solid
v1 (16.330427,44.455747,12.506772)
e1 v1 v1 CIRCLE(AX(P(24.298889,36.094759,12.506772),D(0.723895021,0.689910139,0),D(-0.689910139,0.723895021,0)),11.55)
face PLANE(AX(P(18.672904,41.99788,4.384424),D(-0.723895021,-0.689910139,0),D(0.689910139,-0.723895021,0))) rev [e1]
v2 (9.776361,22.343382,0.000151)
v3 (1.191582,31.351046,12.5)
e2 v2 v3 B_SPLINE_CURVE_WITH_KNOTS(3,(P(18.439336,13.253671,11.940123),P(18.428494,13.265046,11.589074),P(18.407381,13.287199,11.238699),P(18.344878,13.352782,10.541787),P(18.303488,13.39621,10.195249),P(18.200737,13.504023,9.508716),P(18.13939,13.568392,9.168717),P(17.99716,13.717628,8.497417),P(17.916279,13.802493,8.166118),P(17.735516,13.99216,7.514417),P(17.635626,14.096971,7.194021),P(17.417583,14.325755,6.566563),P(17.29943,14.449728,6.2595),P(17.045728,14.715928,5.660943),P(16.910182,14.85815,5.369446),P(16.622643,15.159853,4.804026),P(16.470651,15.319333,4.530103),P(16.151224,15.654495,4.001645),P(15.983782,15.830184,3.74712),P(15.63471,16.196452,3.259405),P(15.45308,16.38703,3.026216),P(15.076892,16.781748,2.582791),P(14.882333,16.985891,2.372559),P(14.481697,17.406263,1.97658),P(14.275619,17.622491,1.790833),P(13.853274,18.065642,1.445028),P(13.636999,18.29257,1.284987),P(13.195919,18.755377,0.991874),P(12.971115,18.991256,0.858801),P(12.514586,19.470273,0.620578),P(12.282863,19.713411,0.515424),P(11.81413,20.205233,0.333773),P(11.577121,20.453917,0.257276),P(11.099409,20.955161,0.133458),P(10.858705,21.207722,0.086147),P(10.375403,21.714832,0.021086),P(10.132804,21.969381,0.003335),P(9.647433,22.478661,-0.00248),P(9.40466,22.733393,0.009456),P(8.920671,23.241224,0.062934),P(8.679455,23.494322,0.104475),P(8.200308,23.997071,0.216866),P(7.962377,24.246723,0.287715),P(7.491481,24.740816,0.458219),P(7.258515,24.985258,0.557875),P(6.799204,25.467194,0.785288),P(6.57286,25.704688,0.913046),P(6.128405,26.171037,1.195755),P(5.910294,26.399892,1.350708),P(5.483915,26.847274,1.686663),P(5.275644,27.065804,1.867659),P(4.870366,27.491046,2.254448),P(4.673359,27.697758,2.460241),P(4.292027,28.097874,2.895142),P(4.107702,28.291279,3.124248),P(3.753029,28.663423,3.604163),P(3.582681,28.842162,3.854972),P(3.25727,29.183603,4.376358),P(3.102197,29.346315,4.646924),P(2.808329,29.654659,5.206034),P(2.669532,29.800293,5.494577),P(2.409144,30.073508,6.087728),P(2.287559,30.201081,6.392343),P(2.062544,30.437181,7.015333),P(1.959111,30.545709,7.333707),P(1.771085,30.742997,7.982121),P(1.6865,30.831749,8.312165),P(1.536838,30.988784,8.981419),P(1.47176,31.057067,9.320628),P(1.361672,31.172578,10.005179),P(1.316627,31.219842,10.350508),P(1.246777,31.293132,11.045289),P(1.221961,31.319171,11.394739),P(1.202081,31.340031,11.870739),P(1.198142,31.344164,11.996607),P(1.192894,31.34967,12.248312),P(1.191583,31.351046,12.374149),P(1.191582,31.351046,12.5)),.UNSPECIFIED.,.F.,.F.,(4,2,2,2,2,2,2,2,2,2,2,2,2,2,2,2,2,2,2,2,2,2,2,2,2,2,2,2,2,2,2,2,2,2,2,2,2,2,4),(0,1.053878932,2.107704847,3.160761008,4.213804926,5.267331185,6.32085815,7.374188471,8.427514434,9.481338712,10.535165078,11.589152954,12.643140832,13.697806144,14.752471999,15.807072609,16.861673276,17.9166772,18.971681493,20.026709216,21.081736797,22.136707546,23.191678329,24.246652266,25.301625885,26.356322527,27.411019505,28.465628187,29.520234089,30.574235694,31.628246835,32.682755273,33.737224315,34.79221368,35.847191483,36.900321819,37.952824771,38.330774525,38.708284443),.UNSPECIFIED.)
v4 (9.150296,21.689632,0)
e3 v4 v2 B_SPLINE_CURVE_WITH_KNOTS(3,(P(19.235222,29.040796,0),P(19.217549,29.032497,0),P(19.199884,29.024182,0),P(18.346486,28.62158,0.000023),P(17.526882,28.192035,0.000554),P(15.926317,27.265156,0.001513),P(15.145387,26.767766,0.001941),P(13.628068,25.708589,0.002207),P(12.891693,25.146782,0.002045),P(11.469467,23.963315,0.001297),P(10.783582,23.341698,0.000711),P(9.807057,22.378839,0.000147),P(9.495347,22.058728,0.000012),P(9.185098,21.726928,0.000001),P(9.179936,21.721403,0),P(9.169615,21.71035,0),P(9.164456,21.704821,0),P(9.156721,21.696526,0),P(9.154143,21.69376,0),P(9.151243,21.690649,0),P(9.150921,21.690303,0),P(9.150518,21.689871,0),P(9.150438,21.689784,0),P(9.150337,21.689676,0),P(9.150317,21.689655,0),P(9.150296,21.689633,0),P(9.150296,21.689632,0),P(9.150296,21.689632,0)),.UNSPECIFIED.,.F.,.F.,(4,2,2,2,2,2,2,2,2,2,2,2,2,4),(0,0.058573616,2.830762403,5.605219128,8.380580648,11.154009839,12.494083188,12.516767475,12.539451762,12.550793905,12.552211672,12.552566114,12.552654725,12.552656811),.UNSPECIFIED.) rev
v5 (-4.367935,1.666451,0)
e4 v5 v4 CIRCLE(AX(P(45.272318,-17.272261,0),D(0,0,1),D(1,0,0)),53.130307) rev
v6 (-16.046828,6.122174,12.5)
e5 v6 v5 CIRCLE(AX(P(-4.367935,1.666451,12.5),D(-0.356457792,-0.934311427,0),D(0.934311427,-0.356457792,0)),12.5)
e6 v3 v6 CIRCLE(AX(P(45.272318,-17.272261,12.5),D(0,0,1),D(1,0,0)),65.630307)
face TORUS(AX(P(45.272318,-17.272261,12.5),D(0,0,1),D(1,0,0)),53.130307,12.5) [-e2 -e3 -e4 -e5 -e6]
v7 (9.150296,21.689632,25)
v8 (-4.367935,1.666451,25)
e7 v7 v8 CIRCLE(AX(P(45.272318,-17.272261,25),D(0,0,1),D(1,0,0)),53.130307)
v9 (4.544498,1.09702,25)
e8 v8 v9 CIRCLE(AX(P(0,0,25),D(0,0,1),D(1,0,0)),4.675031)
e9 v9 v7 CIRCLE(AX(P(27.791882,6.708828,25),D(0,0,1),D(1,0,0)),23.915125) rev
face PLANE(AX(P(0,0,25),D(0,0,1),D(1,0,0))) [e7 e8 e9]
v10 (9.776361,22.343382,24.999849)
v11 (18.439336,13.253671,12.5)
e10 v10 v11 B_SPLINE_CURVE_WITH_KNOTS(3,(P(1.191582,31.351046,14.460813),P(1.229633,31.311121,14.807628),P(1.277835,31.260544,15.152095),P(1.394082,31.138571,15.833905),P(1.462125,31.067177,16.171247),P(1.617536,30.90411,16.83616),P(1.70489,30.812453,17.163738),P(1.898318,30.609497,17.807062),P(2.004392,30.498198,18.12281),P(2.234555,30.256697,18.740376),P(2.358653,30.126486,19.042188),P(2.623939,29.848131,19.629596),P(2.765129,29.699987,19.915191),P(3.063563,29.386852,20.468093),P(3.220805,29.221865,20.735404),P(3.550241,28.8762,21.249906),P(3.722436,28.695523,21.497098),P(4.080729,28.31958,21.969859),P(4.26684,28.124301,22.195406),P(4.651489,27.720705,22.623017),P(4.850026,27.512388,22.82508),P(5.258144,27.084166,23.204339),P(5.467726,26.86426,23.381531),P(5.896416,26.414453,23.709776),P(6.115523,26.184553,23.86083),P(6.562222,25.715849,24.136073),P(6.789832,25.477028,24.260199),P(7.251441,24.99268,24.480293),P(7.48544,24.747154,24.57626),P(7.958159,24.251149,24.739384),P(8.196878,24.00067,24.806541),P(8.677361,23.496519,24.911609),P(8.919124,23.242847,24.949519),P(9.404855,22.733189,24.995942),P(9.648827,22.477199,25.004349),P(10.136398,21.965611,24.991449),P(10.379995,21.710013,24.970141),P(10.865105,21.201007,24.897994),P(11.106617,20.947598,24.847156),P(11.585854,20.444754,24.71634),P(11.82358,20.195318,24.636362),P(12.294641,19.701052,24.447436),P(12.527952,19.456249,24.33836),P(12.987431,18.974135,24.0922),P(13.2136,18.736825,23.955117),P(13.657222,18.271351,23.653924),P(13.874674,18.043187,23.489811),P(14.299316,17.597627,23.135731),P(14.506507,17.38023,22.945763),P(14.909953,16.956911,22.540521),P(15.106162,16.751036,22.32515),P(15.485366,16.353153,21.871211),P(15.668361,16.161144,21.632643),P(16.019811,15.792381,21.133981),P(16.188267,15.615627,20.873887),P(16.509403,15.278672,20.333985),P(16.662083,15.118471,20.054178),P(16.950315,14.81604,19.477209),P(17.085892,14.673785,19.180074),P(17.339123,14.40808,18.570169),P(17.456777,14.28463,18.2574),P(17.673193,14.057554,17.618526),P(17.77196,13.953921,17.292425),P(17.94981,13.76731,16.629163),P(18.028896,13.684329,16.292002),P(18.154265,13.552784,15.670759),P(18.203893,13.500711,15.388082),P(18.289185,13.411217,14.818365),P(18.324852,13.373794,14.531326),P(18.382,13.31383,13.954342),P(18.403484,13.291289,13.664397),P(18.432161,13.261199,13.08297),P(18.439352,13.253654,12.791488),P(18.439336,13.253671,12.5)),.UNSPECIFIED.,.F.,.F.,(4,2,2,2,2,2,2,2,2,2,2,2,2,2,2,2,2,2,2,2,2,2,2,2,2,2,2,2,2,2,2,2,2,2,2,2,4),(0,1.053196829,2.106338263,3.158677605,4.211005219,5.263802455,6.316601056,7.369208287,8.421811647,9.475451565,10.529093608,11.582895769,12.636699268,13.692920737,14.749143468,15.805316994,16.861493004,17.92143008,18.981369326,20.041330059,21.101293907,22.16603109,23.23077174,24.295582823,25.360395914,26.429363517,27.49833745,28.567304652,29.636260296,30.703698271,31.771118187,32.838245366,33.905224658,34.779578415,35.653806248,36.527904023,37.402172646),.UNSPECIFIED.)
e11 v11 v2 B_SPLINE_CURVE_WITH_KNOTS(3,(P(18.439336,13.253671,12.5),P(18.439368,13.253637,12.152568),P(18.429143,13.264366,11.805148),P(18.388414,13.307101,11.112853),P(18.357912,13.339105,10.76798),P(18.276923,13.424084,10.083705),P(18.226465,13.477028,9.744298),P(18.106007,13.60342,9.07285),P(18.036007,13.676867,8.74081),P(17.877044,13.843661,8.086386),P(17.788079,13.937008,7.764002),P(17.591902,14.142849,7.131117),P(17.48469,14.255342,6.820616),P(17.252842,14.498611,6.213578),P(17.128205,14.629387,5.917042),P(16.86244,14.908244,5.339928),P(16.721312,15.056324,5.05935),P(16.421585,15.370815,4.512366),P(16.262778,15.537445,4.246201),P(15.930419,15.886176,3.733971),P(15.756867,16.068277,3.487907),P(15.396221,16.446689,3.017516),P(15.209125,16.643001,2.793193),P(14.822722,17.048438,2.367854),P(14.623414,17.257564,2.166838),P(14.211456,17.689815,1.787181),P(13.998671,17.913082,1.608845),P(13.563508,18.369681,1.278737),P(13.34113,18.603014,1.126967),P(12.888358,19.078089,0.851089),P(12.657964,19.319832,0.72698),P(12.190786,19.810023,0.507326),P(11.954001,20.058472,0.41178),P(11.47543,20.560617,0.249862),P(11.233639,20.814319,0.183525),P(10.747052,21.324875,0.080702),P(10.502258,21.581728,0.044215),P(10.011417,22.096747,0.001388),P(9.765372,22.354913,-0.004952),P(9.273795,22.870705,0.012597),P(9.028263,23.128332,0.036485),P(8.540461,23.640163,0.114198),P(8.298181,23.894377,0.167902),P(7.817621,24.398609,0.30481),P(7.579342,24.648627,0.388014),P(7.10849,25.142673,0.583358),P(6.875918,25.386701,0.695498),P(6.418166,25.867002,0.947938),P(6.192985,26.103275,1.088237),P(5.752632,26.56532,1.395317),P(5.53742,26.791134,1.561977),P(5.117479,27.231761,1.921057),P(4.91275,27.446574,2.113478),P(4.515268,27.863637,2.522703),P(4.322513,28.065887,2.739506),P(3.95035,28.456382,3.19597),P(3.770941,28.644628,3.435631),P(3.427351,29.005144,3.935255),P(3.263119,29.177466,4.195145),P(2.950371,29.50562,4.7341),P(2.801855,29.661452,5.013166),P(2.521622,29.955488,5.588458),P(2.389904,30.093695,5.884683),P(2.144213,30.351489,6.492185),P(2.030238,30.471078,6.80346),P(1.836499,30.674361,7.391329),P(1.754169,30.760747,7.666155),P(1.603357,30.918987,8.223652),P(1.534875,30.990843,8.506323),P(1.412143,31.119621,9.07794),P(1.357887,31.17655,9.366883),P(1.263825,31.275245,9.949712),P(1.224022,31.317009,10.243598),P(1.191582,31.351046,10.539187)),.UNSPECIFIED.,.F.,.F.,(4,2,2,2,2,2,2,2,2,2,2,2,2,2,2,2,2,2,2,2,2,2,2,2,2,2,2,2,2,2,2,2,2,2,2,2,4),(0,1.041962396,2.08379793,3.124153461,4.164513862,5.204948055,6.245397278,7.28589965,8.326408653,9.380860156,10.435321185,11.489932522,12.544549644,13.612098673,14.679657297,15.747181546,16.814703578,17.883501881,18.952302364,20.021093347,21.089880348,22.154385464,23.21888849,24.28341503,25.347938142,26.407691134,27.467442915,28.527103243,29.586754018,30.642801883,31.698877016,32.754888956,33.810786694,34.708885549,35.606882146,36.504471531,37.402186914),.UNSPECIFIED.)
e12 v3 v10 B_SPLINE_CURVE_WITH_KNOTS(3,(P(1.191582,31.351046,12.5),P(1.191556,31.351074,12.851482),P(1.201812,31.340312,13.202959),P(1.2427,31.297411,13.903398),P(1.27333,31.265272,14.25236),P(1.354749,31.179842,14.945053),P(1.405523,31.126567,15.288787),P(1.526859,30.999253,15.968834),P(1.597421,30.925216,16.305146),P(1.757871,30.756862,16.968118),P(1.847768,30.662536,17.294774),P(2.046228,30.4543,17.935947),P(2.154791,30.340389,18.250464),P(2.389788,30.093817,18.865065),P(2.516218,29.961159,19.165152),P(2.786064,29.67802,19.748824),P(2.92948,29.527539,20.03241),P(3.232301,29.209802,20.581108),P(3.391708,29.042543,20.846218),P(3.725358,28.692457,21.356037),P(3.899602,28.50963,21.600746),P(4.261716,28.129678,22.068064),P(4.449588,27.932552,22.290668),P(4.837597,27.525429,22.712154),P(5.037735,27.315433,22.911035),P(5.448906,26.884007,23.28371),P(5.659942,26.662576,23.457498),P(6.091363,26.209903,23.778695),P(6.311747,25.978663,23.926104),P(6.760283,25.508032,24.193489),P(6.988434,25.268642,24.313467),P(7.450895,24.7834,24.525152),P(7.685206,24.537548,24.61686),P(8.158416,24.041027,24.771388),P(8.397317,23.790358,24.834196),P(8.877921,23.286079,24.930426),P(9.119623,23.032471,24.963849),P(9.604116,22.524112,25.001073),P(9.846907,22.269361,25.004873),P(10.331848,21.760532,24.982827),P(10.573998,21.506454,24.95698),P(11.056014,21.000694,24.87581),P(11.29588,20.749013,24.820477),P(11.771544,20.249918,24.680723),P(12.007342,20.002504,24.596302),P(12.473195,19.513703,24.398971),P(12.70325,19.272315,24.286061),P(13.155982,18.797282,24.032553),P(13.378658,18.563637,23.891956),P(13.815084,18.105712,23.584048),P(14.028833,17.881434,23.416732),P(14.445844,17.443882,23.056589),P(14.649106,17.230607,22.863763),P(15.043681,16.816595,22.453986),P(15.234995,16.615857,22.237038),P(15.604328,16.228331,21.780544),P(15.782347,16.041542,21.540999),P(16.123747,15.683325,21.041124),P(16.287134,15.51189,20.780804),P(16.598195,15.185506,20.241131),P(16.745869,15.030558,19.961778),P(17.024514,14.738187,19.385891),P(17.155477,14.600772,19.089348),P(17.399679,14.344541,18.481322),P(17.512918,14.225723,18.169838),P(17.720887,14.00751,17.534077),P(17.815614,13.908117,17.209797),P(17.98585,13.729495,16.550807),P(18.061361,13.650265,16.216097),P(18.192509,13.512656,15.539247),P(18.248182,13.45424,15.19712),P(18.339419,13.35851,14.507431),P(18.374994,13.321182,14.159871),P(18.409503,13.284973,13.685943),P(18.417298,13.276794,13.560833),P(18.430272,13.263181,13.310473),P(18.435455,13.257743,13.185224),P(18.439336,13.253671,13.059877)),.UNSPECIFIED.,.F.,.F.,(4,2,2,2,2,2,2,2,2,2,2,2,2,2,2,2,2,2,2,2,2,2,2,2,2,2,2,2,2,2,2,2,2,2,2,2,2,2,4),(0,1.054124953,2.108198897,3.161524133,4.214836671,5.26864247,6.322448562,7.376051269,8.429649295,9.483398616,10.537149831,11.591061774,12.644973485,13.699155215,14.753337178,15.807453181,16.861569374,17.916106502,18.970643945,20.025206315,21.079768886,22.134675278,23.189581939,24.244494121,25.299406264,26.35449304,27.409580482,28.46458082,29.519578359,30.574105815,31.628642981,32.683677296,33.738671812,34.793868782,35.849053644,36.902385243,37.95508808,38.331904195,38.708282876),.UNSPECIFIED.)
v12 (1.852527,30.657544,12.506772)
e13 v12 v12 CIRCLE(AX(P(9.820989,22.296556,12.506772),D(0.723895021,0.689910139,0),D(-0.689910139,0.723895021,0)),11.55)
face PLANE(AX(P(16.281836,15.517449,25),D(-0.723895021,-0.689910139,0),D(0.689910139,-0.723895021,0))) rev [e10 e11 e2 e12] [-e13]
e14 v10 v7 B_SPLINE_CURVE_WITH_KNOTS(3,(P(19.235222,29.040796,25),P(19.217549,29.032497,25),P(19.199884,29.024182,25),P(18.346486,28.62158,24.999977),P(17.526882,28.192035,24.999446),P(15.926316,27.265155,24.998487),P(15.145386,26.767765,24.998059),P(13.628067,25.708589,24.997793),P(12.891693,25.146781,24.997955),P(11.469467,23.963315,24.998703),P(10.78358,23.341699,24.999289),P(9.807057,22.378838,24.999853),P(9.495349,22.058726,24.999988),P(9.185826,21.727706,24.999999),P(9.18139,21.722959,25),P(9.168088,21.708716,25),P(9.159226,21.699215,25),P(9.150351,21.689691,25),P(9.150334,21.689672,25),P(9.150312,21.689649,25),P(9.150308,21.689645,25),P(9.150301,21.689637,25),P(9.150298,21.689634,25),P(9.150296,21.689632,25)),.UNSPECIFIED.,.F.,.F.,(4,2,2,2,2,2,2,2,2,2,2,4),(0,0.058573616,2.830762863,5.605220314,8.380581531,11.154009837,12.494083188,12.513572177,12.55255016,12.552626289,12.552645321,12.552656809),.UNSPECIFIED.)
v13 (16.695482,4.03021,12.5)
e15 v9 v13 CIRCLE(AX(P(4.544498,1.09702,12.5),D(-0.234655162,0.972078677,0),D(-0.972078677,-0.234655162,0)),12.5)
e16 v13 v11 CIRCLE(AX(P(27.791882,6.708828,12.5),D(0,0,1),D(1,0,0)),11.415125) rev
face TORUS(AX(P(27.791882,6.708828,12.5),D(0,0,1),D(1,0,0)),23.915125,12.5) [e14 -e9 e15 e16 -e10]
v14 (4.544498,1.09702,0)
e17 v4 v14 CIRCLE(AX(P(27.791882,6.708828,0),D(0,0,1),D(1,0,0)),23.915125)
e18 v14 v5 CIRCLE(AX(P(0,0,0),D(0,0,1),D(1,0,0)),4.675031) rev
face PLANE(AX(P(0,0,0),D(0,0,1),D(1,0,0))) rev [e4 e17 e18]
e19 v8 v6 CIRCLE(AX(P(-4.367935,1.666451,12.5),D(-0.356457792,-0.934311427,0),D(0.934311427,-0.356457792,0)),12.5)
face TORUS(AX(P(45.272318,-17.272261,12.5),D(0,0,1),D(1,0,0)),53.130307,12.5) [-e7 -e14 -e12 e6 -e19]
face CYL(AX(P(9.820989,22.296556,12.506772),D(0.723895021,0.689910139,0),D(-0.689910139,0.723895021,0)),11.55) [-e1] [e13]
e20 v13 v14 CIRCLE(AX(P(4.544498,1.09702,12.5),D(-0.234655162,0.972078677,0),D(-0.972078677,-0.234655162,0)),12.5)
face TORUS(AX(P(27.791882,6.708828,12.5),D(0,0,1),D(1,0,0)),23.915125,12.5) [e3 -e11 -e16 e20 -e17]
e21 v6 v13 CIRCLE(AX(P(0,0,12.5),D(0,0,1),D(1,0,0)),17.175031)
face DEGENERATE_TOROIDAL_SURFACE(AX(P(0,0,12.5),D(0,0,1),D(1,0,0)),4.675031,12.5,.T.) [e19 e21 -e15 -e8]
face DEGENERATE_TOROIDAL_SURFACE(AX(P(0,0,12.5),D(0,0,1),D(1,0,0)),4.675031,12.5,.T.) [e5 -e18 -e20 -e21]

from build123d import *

# Parameters (mm, degrees)
BOSS_EXTRUDE1_DEPTH = 25
FILLET1_ANGLE       = 27.256571
FILLET1_2_ANGLE     = 214.454112
FILLET1_3_ANGLE     = 54.523986
BOSS_EXTRUDE2_DEPTH = 20
SKETCH4_R           = 11.55
BOSS_EXTRUDE3_DEPTH = 20


with BuildPart() as part:
    # Sketch2 → Boss-Extrude1 (new body)
    with BuildSketch(Plane.XY):
        with BuildLine():
            ThreePointArc((16.695481749, 4.030209956), (16.575469403, 8.82948354), (18.439335728, 13.253670723))
            Line((18.439335728, 13.253670723), (1.191582265, 31.351046237))
            ThreePointArc((1.191582265, 31.351046237), (-8.916313316, 19.75380413), (-16.046827969, 6.122174061))
            ThreePointArc((-16.046827969, 6.122174061), (-1.095110216, -17.140082752), (16.695481749, 4.030209956))
        make_face()
    extrude(amount=BOSS_EXTRUDE1_DEPTH)

    # Fillet1: read off the stored shape, not the designer's step
    # Fillet1 outline → Fillet1 (revolve, cut)
    with BuildSketch(Plane(origin=(45.27231793, -17.272260647, 0), x_dir=(-0.6673207357903113, 0.7447704583187209, 0), z_dir=(0.7447704583187209, 0.6673207357903113, 0))):
        with BuildLine():
            ThreePointArc((65.630307245, 12.5), (61.96914201, 3.661165235), (53.130307245, 0))
            Line((53.130307245, 0), (65.630307245, 0))
            Line((65.630307245, 0), (65.630307245, 12.5))
        make_face()
        with BuildLine():
            ThreePointArc((53.130307245, 25), (61.96914201, 21.338834765), (65.630307245, 12.5))
            Line((65.630307245, 12.5), (65.630307245, 25))
            Line((65.630307245, 25), (53.130307245, 25))
        make_face()
    revolve(axis=Axis((45.27231793, -17.272260647, 0), (0, 0, 1)), revolution_arc=FILLET1_ANGLE, mode=Mode.SUBTRACT)

    # Fillet1 2 outline → Fillet1 2 (revolve, cut)
    with BuildSketch(Plane(origin=(0, 0, 0), x_dir=(-0.9343114269174442, 0.356457792075709, 0), z_dir=(0.356457792075709, 0.9343114269174442, 0))):
        with BuildLine():
            ThreePointArc((17.175031386, 12.5), (13.513866151, 3.661165235), (4.675031386, 0))
            Line((4.675031386, 0), (17.175031386, 0))
            Line((17.175031386, 0), (17.175031386, 12.5))
        make_face()
        with BuildLine():
            ThreePointArc((4.675031386, 25), (13.513866151, 21.338834765), (17.175031386, 12.5))
            Line((17.175031386, 12.5), (17.175031386, 25))
            Line((17.175031386, 25), (4.675031386, 25))
        make_face()
    revolve(axis=Axis((0, 0, 0), (0, 0, 1)), revolution_arc=FILLET1_2_ANGLE, mode=Mode.SUBTRACT)

    # Fillet1 3 outline → Fillet1 3 (revolve, cut)
    with BuildSketch(Plane(origin=(27.791881525, 6.708827813, 0), x_dir=(-0.755251050967347, 0.6554356185108632, 0), z_dir=(0.6554356185108632, 0.755251050967347, 0))):
        with BuildLine():
            ThreePointArc((23.915125125, 0), (15.07629036, 3.661165235), (11.415125125, 12.5))
            ThreePointArc((11.415125125, 12.5), (15.07629036, 21.338834765), (23.915125125, 25))
            Line((23.915125125, 25), (0, 25))
            Line((0, 25), (0, 0))
            Line((0, 0), (23.915125125, 0))
        make_face()
    revolve(axis=Axis((27.791881525, 6.708827813, 0), (0, 0, 1)), revolution_arc=FILLET1_3_ANGLE, mode=Mode.SUBTRACT)

    # Sketch3 → Boss-Extrude2 (add)
    with BuildSketch(Plane(origin=(16.28183603, 15.51744857, 0), x_dir=(0, 0, -1), z_dir=(0.7238950205462975, 0.689910138516804, 0))):
        with BuildLine():
            add(Edge.make_bspline(
                [(-12.5, 20.872781575), (-13.256668139, 20.872783302), (-14.000739855, 20.79881073), (-15.098725324, 20.581427208), (-15.461678458, 20.491101322), (-16.181362745, 20.273910071), (-16.539184388, 20.146395237), (-17.580284009, 19.716702167), (-18.238808791, 19.366085439), (-19.173819976, 18.744896669), (-19.477482866, 18.521152694), (-20.062713338, 18.043490327), (-20.341290031, 17.792156843), (-21.136253577, 17.00185096), (-21.612268684, 16.426924712), (-22.24356028, 15.490857573), (-22.440003661, 15.166129183), (-22.796391307, 14.50612924), (-23.1187343, 13.832119756), (-23.37417024, 13.130577693), (-23.595730444, 12.415095599), (-23.689852392, 12.048946993), (-23.917308897, 10.939216126), (-23.995503885, 10.191000747), (-23.999860972, 9.434345392)],
                knots=[0, 0, 0, 0, 0.125, 0.125, 0.1875, 0.1875, 0.25, 0.25, 0.375, 0.375, 0.4375, 0.4375, 0.5, 0.5, 0.625, 0.625, 0.6875, 0.6875, 0.75, 0.8125, 0.8125, 0.875, 0.875, 1, 1, 1, 1], degree=3))
            add(Edge.make_bspline(
                [(-23.999860972, 9.434345392), (-23.996140108, 8.673949048), (-23.918521624, 7.926531477), (-23.696119049, 6.824017675), (-23.604194154, 6.459637687), (-23.384046374, 5.737252794), (-23.255109601, 5.377966861), (-22.821299038, 4.332097389), (-22.4684037, 3.670544318), (-21.636877733, 2.417904815), (-21.153165557, 1.82340781), (-20.096391068, 0.75538362), (-19.520332011, 0.275442623), (-18.583042659, -0.36144191), (-18.257210639, -0.560332334), (-17.59457102, -0.920958023), (-17.256263168, -1.083852584), (-16.22099128, -1.521816354), (-15.502186237, -1.746448083), (-14.013070638, -2.050842838), (-13.260547219, -2.127218425), (-12.5, -2.127218425)],
                knots=[0, 0, 0, 0, 0.125, 0.125, 0.1875, 0.1875, 0.25, 0.25, 0.375, 0.375, 0.5, 0.5, 0.625, 0.625, 0.6875, 0.6875, 0.75, 0.75, 0.875, 0.875, 1, 1, 1, 1], degree=3))
            add(Edge.make_bspline(
                [(-12.5, -2.127218425), (-11.739951783, -2.127220159), (-10.99298274, -2.050953602), (-9.891243761, -1.827423826), (-9.527138939, -1.734594918), (-8.805330439, -1.511610249), (-8.447027671, -1.380955069), (-7.405368997, -0.941566343), (-6.746852838, -0.583764468), (-5.812080094, 0.048657861), (-5.507990701, 0.276728473), (-4.925203492, 0.760295915), (-4.647677713, 1.014556559), (-3.855417752, 1.813612152), (-3.380608745, 2.394327897), (-2.750542265, 3.339309437), (-2.555352052, 3.665512733), (-2.200634738, 4.328941881), (-1.879486858, 5.006483662), (-1.62461868, 5.711889515), (-1.403437836, 6.431457566), (-1.309384468, 6.800035835), (-1.082652346, 7.913685357), (-1.004493644, 8.664749127), (-1.000138932, 9.42453918)],
                knots=[0, 0, 0, 0, 0.125, 0.125, 0.1875, 0.1875, 0.25, 0.25, 0.375, 0.375, 0.4375, 0.4375, 0.5, 0.5, 0.625, 0.625, 0.6875, 0.6875, 0.75, 0.8125, 0.8125, 0.875, 0.875, 1, 1, 1, 1], degree=3))
            add(Edge.make_bspline(
                [(-1.000138932, 9.42453918), (-1.003858377, 10.181599932), (-1.120284499, 11.297746686), (-1.396152663, 12.38592469), (-1.616837561, 13.104926142), (-1.746226262, 13.462294055), (-2.181078725, 14.502028599), (-2.534976545, 15.159282124), (-3.160808146, 16.091874442), (-3.385907391, 16.394636796), (-3.866661712, 16.978055074), (-4.119570523, 17.255527322), (-4.914129627, 18.047235479), (-5.491646985, 18.520723725), (-6.431186182, 19.147723677), (-6.757046383, 19.342774236), (-7.419230774, 19.696069822), (-7.757263319, 19.855548502), (-8.446848802, 20.141058966), (-8.798379325, 20.267146202), (-9.515296315, 20.485043686), (-9.882061099, 20.577108914), (-10.993778189, 20.798707299), (-11.742885367, 20.872781575), (-12.5, 20.872781575)],
                knots=[0, 0, 0, 0, 0.125, 0.1875, 0.1875, 0.25, 0.25, 0.375, 0.375, 0.4375, 0.4375, 0.5, 0.5, 0.625, 0.625, 0.6875, 0.6875, 0.75, 0.75, 0.8125, 0.8125, 0.875, 0.875, 1, 1, 1, 1], degree=3))
        make_face()
    extrude(amount=BOSS_EXTRUDE2_DEPTH)

    # Sketch4 → Boss-Extrude3 (add)
    with BuildSketch(Plane(origin=(30.759736441, 29.31565134, 0), x_dir=(0, 0, -1), z_dir=(0.7238950205462988, 0.6899101385168025, 4.126088551647398e-14))):
        with Locations(Location((-12.506772123, 9.364766291, 0), (0, 0, 90))):
            Circle(SKETCH4_R)
    extrude(amount=-BOSS_EXTRUDE3_DEPTH)


solid = part.part
